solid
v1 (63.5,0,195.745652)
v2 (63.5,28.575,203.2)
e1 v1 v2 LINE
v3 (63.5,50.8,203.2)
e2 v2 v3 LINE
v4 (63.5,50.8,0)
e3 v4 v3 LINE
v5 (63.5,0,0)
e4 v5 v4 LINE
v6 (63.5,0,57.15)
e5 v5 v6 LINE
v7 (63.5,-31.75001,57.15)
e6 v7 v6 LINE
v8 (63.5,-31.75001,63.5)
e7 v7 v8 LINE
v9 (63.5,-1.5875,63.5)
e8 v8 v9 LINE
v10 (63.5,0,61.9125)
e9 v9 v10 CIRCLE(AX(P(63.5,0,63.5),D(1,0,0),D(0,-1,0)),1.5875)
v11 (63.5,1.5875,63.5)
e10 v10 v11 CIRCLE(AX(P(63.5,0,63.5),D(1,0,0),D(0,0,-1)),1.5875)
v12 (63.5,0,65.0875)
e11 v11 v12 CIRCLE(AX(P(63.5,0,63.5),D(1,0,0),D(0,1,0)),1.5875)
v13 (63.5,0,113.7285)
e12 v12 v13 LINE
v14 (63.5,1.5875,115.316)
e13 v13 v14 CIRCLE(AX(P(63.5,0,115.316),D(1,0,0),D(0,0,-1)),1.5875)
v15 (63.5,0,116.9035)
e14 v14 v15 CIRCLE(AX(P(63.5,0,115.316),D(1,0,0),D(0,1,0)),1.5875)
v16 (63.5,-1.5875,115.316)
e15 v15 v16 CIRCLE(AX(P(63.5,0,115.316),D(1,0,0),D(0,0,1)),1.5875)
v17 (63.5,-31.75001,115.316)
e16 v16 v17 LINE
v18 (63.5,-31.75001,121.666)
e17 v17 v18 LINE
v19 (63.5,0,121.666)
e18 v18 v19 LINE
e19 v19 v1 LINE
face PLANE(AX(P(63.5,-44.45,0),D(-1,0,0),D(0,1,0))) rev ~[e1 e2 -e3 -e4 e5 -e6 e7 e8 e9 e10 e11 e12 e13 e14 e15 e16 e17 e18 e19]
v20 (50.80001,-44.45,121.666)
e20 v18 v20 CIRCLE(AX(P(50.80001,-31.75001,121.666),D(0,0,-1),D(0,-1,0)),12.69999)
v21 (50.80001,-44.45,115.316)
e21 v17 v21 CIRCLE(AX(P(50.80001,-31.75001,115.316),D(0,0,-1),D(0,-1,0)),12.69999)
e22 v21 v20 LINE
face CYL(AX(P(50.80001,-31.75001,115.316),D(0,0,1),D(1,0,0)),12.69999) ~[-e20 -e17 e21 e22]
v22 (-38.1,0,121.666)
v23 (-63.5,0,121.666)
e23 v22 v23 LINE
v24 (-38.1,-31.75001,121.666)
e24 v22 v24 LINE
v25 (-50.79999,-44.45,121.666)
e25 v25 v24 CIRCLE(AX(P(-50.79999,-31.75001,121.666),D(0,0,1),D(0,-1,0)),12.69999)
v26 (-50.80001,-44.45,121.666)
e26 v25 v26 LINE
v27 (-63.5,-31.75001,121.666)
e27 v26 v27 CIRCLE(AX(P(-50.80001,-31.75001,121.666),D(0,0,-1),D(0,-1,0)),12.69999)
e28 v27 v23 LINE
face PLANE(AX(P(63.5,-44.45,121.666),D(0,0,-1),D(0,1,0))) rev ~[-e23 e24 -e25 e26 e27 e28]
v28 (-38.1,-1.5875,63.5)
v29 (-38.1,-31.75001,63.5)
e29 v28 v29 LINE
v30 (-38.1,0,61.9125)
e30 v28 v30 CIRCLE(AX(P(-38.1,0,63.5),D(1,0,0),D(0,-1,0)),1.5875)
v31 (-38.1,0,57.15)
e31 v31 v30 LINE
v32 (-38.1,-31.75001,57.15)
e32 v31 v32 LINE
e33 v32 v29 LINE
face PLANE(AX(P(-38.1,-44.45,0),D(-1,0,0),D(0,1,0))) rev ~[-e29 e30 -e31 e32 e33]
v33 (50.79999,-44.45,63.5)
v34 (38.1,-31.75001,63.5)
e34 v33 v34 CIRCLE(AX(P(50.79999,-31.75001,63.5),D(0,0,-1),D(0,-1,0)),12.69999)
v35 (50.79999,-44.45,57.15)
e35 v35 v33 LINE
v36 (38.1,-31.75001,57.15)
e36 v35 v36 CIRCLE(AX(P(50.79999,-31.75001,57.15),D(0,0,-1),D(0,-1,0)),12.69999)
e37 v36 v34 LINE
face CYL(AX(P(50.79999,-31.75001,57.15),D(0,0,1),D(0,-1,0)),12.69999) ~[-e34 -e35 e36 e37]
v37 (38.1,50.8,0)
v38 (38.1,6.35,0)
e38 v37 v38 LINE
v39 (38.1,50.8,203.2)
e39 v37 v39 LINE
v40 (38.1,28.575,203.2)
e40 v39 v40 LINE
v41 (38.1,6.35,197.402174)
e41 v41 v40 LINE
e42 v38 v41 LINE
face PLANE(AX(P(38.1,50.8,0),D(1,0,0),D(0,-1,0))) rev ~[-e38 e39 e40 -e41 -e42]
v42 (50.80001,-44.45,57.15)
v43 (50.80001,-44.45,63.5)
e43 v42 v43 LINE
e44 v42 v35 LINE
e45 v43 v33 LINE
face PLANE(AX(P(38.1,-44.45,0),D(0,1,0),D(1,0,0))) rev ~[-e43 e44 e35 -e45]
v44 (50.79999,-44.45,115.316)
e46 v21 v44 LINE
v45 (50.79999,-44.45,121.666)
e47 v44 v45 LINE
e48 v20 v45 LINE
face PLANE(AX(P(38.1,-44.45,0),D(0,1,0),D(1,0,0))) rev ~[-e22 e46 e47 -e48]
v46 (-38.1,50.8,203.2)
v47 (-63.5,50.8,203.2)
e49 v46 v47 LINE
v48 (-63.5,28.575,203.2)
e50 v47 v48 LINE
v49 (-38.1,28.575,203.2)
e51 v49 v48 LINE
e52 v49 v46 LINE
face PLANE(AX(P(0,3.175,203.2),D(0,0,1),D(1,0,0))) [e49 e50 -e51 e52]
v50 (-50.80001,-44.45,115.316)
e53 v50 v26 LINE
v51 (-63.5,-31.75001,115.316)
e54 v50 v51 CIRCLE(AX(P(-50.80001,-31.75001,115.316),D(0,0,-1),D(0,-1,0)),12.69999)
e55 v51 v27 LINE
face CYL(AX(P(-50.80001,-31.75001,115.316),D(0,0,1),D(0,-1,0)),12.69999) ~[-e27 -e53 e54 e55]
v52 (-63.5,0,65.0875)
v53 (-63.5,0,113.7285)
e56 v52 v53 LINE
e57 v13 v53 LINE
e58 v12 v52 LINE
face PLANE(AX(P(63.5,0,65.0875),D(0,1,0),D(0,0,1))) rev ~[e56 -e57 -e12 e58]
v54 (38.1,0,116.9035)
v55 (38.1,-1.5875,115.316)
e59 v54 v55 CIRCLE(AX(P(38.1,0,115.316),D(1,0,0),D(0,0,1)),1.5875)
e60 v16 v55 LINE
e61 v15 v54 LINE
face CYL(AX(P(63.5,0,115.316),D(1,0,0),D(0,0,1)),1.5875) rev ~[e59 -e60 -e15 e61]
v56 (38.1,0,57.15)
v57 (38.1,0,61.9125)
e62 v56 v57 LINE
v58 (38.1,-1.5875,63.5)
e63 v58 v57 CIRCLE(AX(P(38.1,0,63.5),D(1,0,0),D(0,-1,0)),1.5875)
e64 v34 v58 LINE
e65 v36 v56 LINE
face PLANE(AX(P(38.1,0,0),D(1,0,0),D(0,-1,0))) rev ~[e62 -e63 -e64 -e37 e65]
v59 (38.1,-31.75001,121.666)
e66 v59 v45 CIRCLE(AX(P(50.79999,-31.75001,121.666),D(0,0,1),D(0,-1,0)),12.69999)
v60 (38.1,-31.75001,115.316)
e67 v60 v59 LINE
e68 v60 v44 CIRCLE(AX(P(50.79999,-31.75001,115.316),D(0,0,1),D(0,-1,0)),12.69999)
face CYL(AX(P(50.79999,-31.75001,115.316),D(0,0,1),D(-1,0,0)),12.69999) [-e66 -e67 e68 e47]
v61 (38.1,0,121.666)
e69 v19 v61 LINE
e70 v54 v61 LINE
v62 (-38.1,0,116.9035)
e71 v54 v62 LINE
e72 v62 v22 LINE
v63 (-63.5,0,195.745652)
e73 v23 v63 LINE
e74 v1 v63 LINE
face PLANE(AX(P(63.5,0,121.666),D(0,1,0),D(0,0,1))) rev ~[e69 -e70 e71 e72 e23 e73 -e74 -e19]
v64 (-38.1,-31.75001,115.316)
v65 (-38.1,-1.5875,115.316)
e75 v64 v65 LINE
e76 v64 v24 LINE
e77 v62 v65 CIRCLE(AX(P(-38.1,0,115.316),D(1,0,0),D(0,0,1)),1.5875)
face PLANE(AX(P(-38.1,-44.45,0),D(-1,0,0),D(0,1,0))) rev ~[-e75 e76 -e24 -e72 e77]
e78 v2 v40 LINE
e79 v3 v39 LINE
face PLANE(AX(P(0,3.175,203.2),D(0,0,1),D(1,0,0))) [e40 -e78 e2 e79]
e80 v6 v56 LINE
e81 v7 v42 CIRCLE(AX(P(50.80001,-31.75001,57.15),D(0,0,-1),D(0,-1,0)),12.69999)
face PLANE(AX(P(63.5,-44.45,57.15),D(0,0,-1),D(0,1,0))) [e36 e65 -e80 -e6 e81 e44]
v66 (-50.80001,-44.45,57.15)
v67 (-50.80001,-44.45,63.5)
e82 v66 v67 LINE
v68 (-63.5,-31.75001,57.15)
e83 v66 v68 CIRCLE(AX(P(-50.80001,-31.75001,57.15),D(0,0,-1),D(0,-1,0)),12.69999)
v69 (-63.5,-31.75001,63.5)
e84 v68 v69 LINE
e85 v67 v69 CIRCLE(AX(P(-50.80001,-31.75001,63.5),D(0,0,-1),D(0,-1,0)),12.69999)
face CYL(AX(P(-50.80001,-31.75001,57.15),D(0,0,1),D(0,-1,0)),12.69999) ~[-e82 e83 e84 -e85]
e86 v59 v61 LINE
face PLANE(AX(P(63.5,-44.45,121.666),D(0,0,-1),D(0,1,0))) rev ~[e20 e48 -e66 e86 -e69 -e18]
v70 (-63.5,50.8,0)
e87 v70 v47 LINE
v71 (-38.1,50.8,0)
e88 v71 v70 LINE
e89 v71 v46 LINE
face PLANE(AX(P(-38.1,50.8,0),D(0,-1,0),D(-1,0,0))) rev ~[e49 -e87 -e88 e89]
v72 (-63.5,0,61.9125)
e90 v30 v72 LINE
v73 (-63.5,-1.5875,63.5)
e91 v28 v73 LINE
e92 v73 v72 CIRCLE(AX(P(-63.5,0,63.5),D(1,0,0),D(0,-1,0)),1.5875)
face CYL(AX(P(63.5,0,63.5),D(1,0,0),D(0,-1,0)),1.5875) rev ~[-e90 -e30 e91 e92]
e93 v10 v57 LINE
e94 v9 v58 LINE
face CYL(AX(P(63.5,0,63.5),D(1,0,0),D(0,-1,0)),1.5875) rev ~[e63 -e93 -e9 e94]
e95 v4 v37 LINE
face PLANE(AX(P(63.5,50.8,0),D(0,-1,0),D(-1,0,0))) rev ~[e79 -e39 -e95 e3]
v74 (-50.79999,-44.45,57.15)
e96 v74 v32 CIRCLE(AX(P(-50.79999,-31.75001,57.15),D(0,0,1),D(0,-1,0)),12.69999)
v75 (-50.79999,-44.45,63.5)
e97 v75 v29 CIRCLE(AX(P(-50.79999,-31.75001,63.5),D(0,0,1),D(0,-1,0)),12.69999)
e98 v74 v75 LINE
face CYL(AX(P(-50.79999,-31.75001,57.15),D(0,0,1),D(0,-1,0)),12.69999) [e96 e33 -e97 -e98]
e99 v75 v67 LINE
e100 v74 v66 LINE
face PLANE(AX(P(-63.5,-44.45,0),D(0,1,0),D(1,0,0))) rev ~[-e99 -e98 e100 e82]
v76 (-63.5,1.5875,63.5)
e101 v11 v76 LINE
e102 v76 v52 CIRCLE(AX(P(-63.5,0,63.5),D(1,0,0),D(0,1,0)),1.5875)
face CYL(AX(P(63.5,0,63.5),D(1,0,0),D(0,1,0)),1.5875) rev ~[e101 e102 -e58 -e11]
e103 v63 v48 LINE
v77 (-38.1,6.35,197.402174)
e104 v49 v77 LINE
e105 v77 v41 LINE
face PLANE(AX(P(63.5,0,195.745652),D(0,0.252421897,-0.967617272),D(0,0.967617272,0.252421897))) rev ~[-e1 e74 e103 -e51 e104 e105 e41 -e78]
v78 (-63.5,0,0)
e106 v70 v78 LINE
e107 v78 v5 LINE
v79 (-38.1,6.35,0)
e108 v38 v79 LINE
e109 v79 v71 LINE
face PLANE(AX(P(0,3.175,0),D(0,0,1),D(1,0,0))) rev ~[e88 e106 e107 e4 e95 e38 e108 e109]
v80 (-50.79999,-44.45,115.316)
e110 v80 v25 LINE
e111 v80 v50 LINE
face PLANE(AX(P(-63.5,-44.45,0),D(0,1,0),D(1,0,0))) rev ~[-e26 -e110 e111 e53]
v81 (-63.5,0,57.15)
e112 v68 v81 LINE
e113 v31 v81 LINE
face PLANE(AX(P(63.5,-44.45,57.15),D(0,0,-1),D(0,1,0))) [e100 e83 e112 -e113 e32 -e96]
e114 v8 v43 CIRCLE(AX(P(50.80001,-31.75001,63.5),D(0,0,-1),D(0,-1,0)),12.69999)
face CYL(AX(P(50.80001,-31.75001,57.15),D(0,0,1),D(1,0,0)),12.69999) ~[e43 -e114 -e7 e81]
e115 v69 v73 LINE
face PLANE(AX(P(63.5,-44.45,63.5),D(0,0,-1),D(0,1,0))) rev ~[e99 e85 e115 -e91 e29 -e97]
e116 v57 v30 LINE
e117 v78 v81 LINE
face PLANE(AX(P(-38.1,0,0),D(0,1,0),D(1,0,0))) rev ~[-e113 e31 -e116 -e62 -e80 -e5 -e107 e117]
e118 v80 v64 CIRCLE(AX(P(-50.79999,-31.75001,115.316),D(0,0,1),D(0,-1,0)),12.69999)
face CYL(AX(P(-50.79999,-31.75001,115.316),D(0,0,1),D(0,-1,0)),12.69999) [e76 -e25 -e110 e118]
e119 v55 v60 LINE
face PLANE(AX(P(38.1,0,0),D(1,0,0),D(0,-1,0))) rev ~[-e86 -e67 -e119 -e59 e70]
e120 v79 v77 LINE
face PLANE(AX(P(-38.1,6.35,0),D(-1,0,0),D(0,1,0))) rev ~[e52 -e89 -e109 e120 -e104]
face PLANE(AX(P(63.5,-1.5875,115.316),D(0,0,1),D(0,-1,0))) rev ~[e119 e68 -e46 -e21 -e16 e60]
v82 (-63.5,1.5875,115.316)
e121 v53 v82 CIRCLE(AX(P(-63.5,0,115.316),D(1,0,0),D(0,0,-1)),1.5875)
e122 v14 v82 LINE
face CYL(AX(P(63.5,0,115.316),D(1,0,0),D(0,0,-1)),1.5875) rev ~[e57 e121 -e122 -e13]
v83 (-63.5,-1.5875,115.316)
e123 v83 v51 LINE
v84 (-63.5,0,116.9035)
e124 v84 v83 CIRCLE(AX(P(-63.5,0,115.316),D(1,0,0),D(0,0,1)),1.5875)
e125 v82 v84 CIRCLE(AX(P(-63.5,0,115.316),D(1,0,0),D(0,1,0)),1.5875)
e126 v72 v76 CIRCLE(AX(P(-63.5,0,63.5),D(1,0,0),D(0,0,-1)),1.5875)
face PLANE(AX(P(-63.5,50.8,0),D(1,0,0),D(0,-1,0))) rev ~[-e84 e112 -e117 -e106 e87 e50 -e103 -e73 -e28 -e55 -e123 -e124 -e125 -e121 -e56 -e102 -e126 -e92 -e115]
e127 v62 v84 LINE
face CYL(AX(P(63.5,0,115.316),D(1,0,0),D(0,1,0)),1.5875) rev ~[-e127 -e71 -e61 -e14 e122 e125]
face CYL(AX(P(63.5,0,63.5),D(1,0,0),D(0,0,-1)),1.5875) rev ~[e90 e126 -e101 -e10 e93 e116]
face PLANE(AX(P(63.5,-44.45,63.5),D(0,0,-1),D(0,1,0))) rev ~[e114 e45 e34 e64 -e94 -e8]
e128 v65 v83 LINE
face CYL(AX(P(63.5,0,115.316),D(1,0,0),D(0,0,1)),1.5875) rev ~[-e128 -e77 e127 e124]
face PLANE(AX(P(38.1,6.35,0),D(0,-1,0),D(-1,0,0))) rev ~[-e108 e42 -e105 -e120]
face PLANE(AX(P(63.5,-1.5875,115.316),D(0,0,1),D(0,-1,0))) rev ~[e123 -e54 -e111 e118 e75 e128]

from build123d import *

# Parameters (mm, degrees)
F1_DEPTH = 203.2
F2_W     = 44.45
F2_H     = 57.15
F3_DEPTH = 127.001
F4_R     = 12.69999


# Not quite as in the source:
# - a fillet or chamfer is up to 0.001 mm smaller than in the source, because OpenCascade refuses the exact size
# - a feature of the source that left no trace in its solid (it failed there, or was rolled back) is left out


with BuildPart() as f1:
    # F0 (on Top) → F1 (new body)
    with BuildSketch(Plane.XY):
        Polygon((-38.1, 0), (0, 0), (38.1, 0), (38.1, -44.45), (63.5, -44.45), (63.5, 50.8), (38.1, 50.8), (38.1, 6.35), (0, 6.35), (-38.1, 6.35), (-38.1, 50.8), (-63.5, 50.8), (-63.5, -44.45), (-38.1, -44.45), align=None)
    extrude(amount=F1_DEPTH)

    # F2 (on face) → F3 (cut, through all)
    with BuildSketch(Plane.YZ.offset(63.5)):
        with BuildLine():
            Line((-44.45, 115.316), (-44.45, 63.5))
            Line((-44.45, 63.5), (-1.5875, 63.5))
            ThreePointArc((-1.5875, 63.5), (-1.1225320151, 64.6225320151), (0, 65.0875))
            Line((0, 65.0875), (0, 113.7285))
            ThreePointArc((0, 113.7285), (-1.1225320151, 114.1934679849), (-1.5875, 115.316))
            Line((-1.5875, 115.316), (-44.45, 115.316))
        make_face()
        with BuildLine():
            ThreePointArc((0, 65.0875), (-1.1225320151, 64.6225320151), (-1.5875, 63.5))
            Line((-1.5875, 63.5), (0, 63.5))
            Line((0, 63.5), (0, 65.0875))
        make_face()
        with Locations((-22.225, 28.575)):
            Rectangle(F2_W, F2_H)
        Polygon((-44.45, 203.2), (-44.45, 184.15), (0, 195.7456521739), (0, 203.2), align=None)
        with BuildLine():
            Line((0, 115.316), (0, 113.7285))
            ThreePointArc((0, 113.7285), (1.1225320151, 114.1934679849), (1.5875, 115.316))
            ThreePointArc((1.5875, 115.316), (1.1225320151, 116.4385320151), (0, 116.9035))
            Line((0, 116.9035), (0, 115.316))
        make_face()
        with BuildLine():
            ThreePointArc((0, 116.9035), (-1.1225320151, 116.4385320151), (-1.5875, 115.316))
            Line((-1.5875, 115.316), (0, 115.316))
            Line((0, 115.316), (0, 116.9035))
        make_face()
        with BuildLine():
            Line((0, 115.316), (-1.5875, 115.316))
            ThreePointArc((-1.5875, 115.316), (-1.1225320151, 114.1934679849), (0, 113.7285))
            Line((0, 113.7285), (0, 115.316))
        make_face()
        with BuildLine():
            Line((0, 65.0875), (0, 63.5))
            Line((0, 63.5), (0, 61.9125))
            ThreePointArc((0, 61.9125), (1.1225320151, 62.3774679849), (1.5875, 63.5))
            ThreePointArc((1.5875, 63.5), (1.1225320151, 64.6225320151), (0, 65.0875))
        make_face()
        with BuildLine():
            Line((0, 63.5), (-1.5875, 63.5))
            ThreePointArc((-1.5875, 63.5), (-1.1225320151, 62.3774679849), (0, 61.9125))
            Line((0, 61.9125), (0, 63.5))
        make_face()
        Polygon((0, 203.2), (0, 195.7456521739), (28.575, 203.2), align=None)
        Polygon((-44.45, 184.15), (-44.45, 121.666), (0, 121.666), (0, 195.7456521739), align=None)
    extrude(amount=-F3_DEPTH, mode=Mode.SUBTRACT)

    # F4 (radius 12.7 in the source; OpenCascade refuses exactly that, so slightly less here)
    f4_edges = [f1.edges().sort_by_distance(p)[0] for p in [
        (38.1, -44.45, 118.491),
        (63.5, -44.45, 118.491),
        (-63.5, -44.45, 118.491),
        (-38.1, -44.45, 118.491),
        (-38.1, -44.45, 60.325),
        (-63.5, -44.45, 60.325),
        (38.1, -44.45, 60.325),
        (63.5, -44.45, 60.325),
    ]]
    fillet(f4_edges, radius=F4_R)


solid = f1.part
